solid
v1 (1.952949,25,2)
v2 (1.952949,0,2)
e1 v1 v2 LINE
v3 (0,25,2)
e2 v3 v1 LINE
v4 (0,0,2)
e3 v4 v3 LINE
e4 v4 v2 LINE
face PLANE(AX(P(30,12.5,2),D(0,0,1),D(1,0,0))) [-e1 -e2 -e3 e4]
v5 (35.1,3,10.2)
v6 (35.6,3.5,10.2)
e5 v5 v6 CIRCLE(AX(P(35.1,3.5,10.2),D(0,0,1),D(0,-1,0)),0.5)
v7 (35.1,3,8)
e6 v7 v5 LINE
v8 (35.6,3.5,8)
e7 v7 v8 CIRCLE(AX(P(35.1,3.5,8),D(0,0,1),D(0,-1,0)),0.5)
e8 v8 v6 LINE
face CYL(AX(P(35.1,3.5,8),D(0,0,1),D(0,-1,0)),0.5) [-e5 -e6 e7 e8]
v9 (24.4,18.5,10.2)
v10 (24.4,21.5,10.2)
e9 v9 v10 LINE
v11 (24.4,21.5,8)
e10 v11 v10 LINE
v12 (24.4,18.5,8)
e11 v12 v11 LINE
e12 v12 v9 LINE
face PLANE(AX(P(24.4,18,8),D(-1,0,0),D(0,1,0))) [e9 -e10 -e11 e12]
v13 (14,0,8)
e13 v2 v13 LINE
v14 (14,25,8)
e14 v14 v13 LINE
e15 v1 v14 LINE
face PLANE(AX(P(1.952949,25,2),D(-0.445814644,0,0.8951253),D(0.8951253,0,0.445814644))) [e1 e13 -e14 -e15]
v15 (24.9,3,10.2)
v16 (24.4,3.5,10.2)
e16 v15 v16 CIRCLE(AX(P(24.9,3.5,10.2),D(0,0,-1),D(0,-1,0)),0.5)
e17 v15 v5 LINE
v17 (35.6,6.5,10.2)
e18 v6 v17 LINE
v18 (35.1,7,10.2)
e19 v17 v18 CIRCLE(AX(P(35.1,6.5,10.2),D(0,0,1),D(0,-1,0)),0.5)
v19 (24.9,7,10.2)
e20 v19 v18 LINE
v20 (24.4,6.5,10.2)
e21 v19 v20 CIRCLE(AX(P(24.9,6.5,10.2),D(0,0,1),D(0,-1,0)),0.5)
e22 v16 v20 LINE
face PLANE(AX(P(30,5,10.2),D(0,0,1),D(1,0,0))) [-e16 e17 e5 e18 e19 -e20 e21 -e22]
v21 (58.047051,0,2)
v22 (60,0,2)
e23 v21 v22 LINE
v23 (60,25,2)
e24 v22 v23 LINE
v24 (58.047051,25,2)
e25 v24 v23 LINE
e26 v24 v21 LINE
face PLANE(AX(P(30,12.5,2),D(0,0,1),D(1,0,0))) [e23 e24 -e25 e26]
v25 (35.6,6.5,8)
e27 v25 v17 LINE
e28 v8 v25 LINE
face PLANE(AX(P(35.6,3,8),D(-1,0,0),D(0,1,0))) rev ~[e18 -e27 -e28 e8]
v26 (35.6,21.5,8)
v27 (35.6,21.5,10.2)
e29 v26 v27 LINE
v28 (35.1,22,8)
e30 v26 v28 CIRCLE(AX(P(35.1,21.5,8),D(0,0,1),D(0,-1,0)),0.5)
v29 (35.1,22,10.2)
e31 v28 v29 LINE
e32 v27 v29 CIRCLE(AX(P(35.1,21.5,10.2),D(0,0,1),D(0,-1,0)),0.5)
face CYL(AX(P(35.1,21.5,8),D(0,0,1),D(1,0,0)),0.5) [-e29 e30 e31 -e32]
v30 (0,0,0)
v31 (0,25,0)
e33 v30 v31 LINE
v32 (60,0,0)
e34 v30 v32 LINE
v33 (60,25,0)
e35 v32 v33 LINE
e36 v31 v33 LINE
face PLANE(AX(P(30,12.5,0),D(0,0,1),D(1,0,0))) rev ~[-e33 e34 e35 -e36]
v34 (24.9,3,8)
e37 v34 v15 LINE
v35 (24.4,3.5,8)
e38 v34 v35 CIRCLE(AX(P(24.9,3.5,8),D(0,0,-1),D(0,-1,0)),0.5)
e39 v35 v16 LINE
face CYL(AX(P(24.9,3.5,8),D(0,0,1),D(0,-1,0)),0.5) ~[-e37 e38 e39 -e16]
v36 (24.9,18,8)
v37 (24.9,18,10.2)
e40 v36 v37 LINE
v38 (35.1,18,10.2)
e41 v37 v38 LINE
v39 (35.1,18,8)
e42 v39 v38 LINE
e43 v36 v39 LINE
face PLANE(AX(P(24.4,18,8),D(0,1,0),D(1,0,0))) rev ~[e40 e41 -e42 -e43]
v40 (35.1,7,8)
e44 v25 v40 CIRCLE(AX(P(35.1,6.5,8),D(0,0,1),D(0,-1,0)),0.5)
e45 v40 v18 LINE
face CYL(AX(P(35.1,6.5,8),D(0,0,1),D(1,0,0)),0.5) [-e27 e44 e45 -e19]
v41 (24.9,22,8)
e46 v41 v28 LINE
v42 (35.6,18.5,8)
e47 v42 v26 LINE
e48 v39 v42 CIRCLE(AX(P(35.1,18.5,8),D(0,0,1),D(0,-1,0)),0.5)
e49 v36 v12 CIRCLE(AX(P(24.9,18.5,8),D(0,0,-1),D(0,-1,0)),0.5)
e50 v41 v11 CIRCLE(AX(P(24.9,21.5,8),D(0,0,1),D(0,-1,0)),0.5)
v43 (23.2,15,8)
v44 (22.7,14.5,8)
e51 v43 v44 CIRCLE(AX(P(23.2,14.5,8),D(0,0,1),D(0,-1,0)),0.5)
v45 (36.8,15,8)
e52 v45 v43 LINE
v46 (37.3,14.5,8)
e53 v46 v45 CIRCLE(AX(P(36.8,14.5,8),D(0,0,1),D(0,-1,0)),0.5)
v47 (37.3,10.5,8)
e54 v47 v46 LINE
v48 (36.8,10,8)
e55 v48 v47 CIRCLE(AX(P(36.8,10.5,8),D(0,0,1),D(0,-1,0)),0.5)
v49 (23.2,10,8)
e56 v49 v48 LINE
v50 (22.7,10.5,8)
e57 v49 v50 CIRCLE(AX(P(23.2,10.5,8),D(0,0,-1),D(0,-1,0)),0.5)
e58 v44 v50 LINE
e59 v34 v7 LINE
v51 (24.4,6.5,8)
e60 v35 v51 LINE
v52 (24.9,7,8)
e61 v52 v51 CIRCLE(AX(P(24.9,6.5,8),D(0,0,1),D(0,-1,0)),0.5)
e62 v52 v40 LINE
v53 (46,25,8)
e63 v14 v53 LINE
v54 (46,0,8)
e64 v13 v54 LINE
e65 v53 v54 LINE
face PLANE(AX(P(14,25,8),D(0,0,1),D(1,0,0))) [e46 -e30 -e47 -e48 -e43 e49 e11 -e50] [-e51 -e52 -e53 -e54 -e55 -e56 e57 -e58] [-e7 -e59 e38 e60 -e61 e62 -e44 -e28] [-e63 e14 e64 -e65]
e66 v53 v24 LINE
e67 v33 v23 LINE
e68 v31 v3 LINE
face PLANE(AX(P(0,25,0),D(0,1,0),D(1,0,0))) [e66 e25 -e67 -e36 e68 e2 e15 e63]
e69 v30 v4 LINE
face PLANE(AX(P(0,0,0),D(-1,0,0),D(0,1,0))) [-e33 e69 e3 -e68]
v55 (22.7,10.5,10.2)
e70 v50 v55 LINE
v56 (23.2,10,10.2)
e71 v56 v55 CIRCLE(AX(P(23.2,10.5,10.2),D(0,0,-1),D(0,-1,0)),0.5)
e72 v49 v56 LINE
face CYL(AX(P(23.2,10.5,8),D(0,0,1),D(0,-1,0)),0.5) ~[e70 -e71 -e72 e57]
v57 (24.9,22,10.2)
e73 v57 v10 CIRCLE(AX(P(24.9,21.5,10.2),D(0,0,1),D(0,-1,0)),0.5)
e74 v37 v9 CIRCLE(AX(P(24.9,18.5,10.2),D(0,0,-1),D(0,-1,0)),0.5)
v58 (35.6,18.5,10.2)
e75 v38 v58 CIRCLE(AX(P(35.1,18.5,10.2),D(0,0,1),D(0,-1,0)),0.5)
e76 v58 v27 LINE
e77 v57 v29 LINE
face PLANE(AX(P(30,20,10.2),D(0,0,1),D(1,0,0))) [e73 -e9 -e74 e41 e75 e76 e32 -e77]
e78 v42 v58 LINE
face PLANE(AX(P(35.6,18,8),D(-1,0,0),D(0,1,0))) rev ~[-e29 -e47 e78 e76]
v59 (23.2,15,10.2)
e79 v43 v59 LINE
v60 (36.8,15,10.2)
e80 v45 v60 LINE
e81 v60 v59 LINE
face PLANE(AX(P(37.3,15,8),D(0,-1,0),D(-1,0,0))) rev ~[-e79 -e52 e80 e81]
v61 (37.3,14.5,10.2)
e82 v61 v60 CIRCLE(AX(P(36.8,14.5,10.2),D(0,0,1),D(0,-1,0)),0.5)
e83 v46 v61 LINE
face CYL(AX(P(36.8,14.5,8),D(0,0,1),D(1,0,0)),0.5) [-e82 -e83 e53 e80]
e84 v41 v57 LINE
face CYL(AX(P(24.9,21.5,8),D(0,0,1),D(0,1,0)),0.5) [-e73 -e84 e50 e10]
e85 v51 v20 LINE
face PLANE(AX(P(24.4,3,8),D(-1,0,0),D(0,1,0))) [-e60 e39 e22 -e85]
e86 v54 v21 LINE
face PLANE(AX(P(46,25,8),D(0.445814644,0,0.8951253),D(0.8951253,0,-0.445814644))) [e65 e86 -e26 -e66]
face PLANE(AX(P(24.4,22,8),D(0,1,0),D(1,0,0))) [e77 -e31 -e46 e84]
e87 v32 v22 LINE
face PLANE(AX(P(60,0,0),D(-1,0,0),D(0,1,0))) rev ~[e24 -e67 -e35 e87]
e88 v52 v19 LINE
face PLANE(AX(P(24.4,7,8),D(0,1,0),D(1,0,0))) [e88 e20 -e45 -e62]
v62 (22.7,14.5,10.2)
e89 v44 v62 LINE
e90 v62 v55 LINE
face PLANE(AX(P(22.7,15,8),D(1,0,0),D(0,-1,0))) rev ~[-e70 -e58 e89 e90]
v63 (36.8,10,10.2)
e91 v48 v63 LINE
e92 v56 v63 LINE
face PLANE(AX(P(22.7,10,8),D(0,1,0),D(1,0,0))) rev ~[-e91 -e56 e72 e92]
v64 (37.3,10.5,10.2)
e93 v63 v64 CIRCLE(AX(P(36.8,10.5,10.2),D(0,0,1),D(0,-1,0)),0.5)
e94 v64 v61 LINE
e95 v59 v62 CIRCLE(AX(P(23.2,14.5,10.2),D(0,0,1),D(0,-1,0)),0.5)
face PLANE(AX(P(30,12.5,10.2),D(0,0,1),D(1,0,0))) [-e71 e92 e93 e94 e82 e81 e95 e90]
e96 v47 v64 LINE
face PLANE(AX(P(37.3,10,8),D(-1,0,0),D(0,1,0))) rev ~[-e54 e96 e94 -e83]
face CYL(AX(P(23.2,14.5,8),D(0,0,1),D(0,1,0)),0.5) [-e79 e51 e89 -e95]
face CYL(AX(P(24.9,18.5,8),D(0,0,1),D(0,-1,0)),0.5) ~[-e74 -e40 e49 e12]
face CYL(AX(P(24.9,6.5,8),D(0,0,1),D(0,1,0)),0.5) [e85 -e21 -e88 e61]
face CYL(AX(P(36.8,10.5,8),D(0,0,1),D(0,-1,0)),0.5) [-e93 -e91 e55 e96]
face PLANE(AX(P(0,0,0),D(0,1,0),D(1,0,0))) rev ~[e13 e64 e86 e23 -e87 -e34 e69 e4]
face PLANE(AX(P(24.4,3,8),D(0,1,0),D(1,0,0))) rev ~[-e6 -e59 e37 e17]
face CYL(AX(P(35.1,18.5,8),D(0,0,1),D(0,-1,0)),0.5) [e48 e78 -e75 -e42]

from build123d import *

# Parameters (mm, degrees)
F0_W     = 60
F0_H     = 25
F1_DEPTH = 2
F3_DEPTH = 25
F4_W     = 11.2
F4_H     = 4
F5_DEPTH = 2.2
F6_R     = 0.5


with BuildPart() as f1:
    # F0 (on Top) → F1 (new body)
    with BuildSketch(Plane.XY):
        with Locations((30, 12.5)):
            Rectangle(F0_W, F0_H)
    extrude(amount=F1_DEPTH)

    # F2 (on face) → F3 (join, through all)
    with BuildSketch(Plane(origin=(0, 25, 0), x_dir=(-1, 0, 0), z_dir=(0, 1, 0))):
        Polygon((-1.9529488989, 2), (-14, 8), (-46, 8), (-58.0470511011, 2), align=None)
    extrude(amount=-F3_DEPTH)

    # F4 (on face) → F5 (join)
    with BuildSketch(Plane.XY.offset(8)):
        with Locations((30, 5)):
            Rectangle(F4_W, F4_H)
        Polygon((22.7, 13.0000000004), (22.7, 11.9999999996), (22.7, 10), (37.3, 10), (37.3, 12.5), (37.3, 15), (22.7, 15), align=None)
        with Locations((30, 20)):
            Rectangle(F4_W, F4_H)
    extrude(amount=F5_DEPTH)

    # F6
    f6_edges = [f1.edges().sort_by_distance(p)[0] for p in [
        (24.4, 18, 9.1),
        (35.6, 18, 9.1),
        (22.7, 10, 9.1),
        (24.4, 3, 9.1),
        (35.6, 3, 9.1),
        (22.7, 15, 9.1),
        (35.6, 7, 9.1),
        (24.4, 7, 9.1),
        (24.4, 22, 9.1),
        (35.6, 22, 9.1),
        (37.3, 10, 9.1),
        (37.3, 15, 9.1),
    ]]
    fillet(f6_edges, radius=F6_R)


solid = f1.part
